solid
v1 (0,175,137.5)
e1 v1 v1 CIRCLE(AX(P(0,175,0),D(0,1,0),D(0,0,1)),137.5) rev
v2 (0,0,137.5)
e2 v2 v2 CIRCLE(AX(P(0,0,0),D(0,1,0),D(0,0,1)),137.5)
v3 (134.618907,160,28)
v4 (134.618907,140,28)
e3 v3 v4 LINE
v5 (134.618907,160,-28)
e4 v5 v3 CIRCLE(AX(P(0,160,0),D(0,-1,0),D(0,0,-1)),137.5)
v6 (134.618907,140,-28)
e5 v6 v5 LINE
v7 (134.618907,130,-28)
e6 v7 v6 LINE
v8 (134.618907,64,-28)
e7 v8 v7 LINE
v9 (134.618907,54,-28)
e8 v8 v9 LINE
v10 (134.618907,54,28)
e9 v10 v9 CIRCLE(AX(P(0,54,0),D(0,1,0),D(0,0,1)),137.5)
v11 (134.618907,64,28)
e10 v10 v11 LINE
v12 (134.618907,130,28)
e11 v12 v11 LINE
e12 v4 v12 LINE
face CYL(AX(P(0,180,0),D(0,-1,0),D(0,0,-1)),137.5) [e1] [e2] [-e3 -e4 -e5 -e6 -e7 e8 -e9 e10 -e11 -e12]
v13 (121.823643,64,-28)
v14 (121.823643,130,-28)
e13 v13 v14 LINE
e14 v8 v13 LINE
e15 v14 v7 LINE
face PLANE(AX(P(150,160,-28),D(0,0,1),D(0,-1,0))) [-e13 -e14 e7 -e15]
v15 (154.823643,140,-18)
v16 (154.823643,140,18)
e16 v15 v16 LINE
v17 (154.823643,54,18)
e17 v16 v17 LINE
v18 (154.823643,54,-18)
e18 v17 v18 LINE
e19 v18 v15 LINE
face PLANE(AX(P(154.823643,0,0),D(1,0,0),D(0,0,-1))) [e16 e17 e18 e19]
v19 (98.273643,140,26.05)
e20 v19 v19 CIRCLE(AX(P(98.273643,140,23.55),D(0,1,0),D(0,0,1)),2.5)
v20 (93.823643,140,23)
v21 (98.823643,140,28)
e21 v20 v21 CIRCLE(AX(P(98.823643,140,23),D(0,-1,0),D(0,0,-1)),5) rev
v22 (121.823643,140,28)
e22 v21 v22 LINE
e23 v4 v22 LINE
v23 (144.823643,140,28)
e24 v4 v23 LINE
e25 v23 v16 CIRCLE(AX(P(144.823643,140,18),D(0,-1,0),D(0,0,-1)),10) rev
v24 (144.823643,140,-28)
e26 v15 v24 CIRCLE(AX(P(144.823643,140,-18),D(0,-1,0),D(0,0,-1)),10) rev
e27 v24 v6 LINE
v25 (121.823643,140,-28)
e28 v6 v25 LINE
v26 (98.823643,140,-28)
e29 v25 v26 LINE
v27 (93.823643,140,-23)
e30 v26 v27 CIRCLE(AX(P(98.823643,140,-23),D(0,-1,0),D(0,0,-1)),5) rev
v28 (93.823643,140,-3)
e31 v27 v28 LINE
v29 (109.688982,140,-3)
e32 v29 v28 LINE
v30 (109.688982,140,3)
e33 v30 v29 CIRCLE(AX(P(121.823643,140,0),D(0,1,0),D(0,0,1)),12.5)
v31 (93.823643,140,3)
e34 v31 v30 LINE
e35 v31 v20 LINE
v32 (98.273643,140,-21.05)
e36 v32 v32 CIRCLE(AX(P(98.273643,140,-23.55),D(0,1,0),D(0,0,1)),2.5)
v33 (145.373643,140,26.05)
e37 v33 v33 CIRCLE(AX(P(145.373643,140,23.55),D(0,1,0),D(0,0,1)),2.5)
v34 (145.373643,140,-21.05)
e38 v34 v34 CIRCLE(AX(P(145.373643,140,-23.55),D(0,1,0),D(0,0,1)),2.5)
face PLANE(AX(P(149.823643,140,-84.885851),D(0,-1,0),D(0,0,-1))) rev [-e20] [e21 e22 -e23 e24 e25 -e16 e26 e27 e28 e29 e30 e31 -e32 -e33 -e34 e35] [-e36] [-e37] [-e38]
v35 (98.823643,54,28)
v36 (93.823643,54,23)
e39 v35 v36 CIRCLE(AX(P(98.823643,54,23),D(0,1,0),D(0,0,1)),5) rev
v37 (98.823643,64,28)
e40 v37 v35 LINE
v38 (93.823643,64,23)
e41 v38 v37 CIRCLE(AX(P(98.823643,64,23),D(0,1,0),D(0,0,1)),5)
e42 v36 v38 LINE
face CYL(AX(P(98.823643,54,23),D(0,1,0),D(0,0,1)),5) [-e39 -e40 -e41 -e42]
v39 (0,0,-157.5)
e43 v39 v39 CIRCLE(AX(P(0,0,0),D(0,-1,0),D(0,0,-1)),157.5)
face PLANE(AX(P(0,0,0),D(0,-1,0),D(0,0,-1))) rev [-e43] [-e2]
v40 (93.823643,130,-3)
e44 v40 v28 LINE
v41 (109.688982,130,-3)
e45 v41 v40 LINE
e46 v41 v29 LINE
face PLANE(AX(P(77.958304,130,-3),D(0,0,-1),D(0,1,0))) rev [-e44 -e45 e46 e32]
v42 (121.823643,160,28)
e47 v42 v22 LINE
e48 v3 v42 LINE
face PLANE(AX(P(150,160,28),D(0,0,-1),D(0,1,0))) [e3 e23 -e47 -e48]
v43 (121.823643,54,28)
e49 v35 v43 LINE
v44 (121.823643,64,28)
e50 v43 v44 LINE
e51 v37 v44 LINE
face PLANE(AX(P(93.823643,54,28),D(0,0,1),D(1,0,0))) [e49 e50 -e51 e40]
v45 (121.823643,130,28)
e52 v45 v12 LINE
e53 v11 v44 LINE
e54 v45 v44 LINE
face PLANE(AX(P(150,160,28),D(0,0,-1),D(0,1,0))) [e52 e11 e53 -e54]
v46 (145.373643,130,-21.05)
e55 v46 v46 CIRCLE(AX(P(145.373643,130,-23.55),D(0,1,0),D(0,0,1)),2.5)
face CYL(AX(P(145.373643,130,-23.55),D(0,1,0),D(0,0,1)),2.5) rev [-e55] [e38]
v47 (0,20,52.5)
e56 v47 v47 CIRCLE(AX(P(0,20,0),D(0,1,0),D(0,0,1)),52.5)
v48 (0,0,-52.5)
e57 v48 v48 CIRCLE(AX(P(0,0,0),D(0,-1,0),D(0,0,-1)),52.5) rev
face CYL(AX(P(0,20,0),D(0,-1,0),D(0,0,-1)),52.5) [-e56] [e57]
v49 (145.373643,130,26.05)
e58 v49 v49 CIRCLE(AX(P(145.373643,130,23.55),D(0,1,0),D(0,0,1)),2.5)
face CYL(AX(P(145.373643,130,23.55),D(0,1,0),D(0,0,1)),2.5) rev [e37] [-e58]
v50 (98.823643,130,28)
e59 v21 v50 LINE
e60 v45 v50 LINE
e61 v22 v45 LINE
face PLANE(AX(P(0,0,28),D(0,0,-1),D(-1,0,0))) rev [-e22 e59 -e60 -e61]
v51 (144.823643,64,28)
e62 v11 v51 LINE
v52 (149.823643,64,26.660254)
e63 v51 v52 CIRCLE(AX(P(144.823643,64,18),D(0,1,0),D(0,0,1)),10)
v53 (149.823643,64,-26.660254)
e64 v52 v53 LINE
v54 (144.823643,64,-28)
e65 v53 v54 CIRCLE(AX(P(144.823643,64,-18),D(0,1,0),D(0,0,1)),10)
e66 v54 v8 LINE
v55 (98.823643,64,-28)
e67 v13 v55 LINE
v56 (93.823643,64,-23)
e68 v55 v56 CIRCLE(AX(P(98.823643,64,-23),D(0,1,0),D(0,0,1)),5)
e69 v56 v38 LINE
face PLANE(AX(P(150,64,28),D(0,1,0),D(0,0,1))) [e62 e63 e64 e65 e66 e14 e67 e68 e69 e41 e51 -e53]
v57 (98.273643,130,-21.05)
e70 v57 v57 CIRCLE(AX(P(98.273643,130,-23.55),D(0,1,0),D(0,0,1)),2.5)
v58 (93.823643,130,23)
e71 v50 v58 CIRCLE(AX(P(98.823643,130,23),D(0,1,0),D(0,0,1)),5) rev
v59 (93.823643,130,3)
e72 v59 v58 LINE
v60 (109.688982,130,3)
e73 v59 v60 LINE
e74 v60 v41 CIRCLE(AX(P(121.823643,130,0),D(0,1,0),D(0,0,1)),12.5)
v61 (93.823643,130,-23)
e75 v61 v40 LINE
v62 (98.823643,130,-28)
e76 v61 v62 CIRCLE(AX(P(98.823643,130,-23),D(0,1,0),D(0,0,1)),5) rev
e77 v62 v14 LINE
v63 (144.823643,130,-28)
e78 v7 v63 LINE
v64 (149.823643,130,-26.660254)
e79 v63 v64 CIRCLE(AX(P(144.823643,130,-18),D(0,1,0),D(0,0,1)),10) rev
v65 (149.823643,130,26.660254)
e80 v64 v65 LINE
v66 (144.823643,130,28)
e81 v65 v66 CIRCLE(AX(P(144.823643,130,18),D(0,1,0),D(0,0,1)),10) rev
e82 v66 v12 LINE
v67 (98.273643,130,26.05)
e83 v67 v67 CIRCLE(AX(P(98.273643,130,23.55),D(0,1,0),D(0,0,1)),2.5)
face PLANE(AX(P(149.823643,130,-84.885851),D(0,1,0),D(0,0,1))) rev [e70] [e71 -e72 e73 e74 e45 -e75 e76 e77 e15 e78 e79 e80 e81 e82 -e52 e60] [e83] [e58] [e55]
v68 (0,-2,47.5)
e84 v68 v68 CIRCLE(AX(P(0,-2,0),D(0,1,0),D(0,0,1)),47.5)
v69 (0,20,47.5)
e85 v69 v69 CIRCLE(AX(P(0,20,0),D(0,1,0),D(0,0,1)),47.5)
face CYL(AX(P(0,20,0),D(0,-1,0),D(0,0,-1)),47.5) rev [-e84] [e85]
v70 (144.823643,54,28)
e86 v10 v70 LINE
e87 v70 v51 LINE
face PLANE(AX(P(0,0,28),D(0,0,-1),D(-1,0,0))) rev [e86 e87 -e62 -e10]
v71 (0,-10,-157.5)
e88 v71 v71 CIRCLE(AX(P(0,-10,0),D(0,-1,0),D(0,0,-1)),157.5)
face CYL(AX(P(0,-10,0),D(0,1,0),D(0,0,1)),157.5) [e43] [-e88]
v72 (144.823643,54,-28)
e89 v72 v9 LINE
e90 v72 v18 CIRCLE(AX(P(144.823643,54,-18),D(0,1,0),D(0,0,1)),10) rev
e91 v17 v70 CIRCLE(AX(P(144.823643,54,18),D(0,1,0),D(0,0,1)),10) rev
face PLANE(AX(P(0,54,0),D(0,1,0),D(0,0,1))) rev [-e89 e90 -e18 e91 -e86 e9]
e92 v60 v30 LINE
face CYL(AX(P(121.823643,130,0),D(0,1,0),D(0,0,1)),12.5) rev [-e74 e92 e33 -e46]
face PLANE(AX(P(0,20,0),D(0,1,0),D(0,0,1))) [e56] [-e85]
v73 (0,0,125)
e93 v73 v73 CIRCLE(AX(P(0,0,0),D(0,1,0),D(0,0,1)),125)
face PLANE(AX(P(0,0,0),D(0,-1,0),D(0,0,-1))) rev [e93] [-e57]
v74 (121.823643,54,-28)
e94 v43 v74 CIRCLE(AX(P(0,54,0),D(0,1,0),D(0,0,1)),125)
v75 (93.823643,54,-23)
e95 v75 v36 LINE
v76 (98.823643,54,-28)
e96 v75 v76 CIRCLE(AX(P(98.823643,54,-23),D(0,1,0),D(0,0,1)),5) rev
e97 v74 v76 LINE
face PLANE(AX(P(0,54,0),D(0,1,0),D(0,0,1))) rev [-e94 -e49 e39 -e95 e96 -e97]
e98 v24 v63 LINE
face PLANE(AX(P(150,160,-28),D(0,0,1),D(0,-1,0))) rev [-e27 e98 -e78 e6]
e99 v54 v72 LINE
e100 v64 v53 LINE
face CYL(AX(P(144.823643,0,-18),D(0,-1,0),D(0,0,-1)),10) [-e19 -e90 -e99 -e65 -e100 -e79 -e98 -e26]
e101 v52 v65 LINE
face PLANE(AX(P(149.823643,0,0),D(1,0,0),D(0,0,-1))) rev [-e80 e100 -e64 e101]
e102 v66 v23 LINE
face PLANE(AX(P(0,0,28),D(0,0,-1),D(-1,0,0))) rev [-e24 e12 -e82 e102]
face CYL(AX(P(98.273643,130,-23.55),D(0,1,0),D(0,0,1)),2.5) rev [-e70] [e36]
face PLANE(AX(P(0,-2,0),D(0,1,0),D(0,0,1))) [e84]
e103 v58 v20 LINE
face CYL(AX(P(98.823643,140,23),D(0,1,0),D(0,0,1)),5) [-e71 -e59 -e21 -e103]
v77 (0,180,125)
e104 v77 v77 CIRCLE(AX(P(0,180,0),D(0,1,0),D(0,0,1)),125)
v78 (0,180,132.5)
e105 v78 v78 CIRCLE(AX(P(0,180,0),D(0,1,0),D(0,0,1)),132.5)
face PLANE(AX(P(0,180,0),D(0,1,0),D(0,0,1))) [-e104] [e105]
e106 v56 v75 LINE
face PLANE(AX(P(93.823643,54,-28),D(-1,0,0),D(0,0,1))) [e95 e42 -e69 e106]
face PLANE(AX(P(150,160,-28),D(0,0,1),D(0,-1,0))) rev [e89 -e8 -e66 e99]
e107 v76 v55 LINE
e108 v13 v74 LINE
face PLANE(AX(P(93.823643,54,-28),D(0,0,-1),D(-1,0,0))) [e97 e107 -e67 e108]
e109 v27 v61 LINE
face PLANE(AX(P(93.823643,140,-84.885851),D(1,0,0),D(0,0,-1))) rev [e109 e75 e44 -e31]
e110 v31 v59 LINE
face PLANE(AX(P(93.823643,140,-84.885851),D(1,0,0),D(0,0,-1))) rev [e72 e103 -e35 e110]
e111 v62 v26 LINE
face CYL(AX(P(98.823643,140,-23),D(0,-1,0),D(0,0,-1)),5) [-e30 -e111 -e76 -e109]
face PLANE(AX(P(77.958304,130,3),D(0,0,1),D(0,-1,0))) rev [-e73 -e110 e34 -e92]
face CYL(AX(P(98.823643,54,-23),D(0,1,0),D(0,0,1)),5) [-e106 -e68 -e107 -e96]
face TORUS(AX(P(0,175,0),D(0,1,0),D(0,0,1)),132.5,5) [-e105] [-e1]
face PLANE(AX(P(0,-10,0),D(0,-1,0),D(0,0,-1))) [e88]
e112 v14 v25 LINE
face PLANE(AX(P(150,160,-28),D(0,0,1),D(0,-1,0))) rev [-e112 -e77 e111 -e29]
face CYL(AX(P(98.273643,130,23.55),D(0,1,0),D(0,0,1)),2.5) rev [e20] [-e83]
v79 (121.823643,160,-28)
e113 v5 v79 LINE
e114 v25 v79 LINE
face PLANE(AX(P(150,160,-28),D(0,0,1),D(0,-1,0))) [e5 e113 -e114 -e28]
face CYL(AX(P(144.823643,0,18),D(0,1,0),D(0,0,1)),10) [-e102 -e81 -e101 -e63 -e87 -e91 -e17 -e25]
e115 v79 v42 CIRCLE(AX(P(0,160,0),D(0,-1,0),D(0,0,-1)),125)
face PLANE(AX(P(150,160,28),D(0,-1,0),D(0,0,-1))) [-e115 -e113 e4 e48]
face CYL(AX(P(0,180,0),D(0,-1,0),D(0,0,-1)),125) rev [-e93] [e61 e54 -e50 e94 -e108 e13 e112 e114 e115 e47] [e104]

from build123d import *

# Parameters (mm, degrees)
SKETCH1_R           = 137.5
SKETCH1_R_2         = 125
BOSS_EXTRUDE1_DEPTH = 180
SKETCH2_R           = 157.5
BOSS_EXTRUDE2_DEPTH = 10
SKETCH3_R           = 52.5
SKETCH3_R_2         = 47.5
BOSS_EXTRUDE3_DEPTH = 20
SKETCH4_W           = 56
SKETCH4_H           = 96
CUT_EXTRUDE4_DEPTH  = 150
SKETCH5_W           = 56
SKETCH5_H           = 10
BOSS_EXTRUDE4_DEPTH = 56
SKETCH6_W           = 56
SKETCH6_H           = 56
BOSS_EXTRUDE5_DEPTH = 10
SKETCH7_R           = 2.5
SKETCH7_R_2         = 12.5
CUT_EXTRUDE5_DEPTH  = 10
SKETCH8_W           = 56
SKETCH8_H           = 86
BOSS_EXTRUDE6_DEPTH = 5
FILLET1_R           = 10
FILLET2_R           = 5
SKETCH9_W           = 31.730677801
SKETCH9_H           = 6
CUT_EXTRUDE6_DEPTH  = 10
FILLET3_R           = 5
CUT_EXTRUDE7_START  = -2
SKETCH10_R          = 47.5
CUT_EXTRUDE7_DEPTH  = 2


with BuildPart() as part:
    # Sketch1 → Boss-Extrude1 (new body)
    with BuildSketch(Plane(origin=(0, 0, 0), x_dir=(1, 0, 0), z_dir=(0, 1, 0))):
        with Locations(Location((0, 0, 0), (0, 0, 90))):
            Circle(SKETCH1_R)
        with Locations(Location((0, 0, 0), (0, 0, 90))):
            Circle(SKETCH1_R_2, mode=Mode.SUBTRACT)
    extrude(amount=BOSS_EXTRUDE1_DEPTH)

    # Sketch2 → Boss-Extrude2 (add)
    with BuildSketch(Plane.XZ):
        with Locations(Location((0, 0, 0), (0, 0, 270))):
            Circle(SKETCH2_R)
    extrude(amount=BOSS_EXTRUDE2_DEPTH)

    # Sketch3 → Boss-Extrude3 (add)
    with BuildSketch(Plane(origin=(0, 0, 0), x_dir=(1, 0, 0), z_dir=(0, 1, 0))):
        with Locations(Location((0, 0, 0), (0, 0, 90))):
            Circle(SKETCH3_R)
        with Locations(Location((0, 0, 0), (0, 0, 270))):
            Circle(SKETCH3_R_2, mode=Mode.SUBTRACT)
    extrude(amount=BOSS_EXTRUDE3_DEPTH)

    # Sketch4 → Cut-Extrude4 (cut)
    with BuildSketch(Plane(origin=(0, 0, 0), x_dir=(0, 0, -1), z_dir=(1, 0, 0))):
        with Locations((0, 112)):
            Rectangle(SKETCH4_W, SKETCH4_H)
    extrude(amount=CUT_EXTRUDE4_DEPTH, mode=Mode.SUBTRACT)

    # Sketch5 → Boss-Extrude4 (add)
    with BuildSketch(Plane(origin=(0, 0, 28), x_dir=(-1, 0, 0), z_dir=(0, 0, -1))):
        with Locations((-121.823643025, 135)):
            Rectangle(SKETCH5_W, SKETCH5_H)
    extrude(amount=BOSS_EXTRUDE4_DEPTH)

    # Sketch6 → Boss-Extrude5 (add)
    with BuildSketch(Plane(origin=(0, 64, 0), x_dir=(1, 0, 0), z_dir=(0, 1, 0))):
        with Locations((121.823643025, 0)):
            Rectangle(SKETCH6_W, SKETCH6_H)
    extrude(amount=-BOSS_EXTRUDE5_DEPTH)

    # Sketch7 → Cut-Extrude5 (cut)
    with BuildSketch(Plane(origin=(0, 140, 0), x_dir=(1, 0, 0), z_dir=(0, 1, 0))):
        with Locations(Location((98.273643025, 23.55, 0), (0, 0, 270))):
            Circle(SKETCH7_R)
        with Locations(Location((145.373643025, 23.55, 0), (0, 0, 270))):
            Circle(SKETCH7_R)
        with Locations(Location((98.273643025, -23.55, 0), (0, 0, 270))):
            Circle(SKETCH7_R)
        with Locations(Location((145.373643025, -23.55, 0), (0, 0, 270))):
            Circle(SKETCH7_R)
        with Locations(Location((121.823643025, 0, 0), (0, 0, 270))):
            Circle(SKETCH7_R_2)
    extrude(amount=-CUT_EXTRUDE5_DEPTH, mode=Mode.SUBTRACT)

    # Sketch8 → Boss-Extrude6 (add)
    with BuildSketch(Plane(origin=(149.823643025, 0, 0), x_dir=(0, 0, -1), z_dir=(1, 0, 0))):
        with Locations((0, 97)):
            Rectangle(SKETCH8_W, SKETCH8_H)
    extrude(amount=BOSS_EXTRUDE6_DEPTH)

    # Fillet1
    # the kernel refuses this fillet: 10 mm, written as the material it takes off along each edge
    with BuildSketch(Plane(origin=(154.823643025, 165, -28), x_dir=(0, 0, 1), z_dir=(0, -1, 0)), Plane(origin=(154.823643025, 29, 28), x_dir=(0, 0, -1), z_dir=(0, 1, 0))) as fillet1_piece_1:
        with BuildLine():
            CenterArc((FILLET1_R, FILLET1_R), FILLET1_R, 180, 90)
            Line((0, FILLET1_R), (0, 0))
            Line((0, 0), (FILLET1_R, 0))
        make_face()
    extrude(amount=136, mode=Mode.SUBTRACT)

    # Fillet2
    fillet2_edges = [part.edges().sort_by_distance(p)[0] for p in [
        (93.823643025, 135, -28),
        (93.823643025, 135, 28),
        (93.823643025, 59, 28),
        (93.823643025, 59, -28),
    ]]
    fillet(fillet2_edges, radius=FILLET2_R)

    # Sketch9 → Cut-Extrude6 (cut)
    with BuildSketch(Plane(origin=(0, 140, 0), x_dir=(1, 0, 0), z_dir=(0, 1, 0))):
        with Locations((93.823643026, 0)):
            Rectangle(SKETCH9_W, SKETCH9_H)
    extrude(amount=-CUT_EXTRUDE6_DEPTH, mode=Mode.SUBTRACT)

    # Fillet3
    fillet3_edges = [part.edges().sort_by_distance(p)[0] for p in [
        (0, 180, 137.5),
    ]]
    fillet(fillet3_edges, radius=FILLET3_R)

    # Sketch10 → Cut-Extrude7 (cut)
    with BuildSketch(Plane(origin=(0, 0, 0), x_dir=(1, 0, 0), z_dir=(0, 1, 0)).offset(CUT_EXTRUDE7_START)):
        with Locations(Location((0, 0, 0), (0, 0, 270))):
            Circle(SKETCH10_R)
    extrude(amount=CUT_EXTRUDE7_DEPTH, mode=Mode.SUBTRACT)


solid = part.part
